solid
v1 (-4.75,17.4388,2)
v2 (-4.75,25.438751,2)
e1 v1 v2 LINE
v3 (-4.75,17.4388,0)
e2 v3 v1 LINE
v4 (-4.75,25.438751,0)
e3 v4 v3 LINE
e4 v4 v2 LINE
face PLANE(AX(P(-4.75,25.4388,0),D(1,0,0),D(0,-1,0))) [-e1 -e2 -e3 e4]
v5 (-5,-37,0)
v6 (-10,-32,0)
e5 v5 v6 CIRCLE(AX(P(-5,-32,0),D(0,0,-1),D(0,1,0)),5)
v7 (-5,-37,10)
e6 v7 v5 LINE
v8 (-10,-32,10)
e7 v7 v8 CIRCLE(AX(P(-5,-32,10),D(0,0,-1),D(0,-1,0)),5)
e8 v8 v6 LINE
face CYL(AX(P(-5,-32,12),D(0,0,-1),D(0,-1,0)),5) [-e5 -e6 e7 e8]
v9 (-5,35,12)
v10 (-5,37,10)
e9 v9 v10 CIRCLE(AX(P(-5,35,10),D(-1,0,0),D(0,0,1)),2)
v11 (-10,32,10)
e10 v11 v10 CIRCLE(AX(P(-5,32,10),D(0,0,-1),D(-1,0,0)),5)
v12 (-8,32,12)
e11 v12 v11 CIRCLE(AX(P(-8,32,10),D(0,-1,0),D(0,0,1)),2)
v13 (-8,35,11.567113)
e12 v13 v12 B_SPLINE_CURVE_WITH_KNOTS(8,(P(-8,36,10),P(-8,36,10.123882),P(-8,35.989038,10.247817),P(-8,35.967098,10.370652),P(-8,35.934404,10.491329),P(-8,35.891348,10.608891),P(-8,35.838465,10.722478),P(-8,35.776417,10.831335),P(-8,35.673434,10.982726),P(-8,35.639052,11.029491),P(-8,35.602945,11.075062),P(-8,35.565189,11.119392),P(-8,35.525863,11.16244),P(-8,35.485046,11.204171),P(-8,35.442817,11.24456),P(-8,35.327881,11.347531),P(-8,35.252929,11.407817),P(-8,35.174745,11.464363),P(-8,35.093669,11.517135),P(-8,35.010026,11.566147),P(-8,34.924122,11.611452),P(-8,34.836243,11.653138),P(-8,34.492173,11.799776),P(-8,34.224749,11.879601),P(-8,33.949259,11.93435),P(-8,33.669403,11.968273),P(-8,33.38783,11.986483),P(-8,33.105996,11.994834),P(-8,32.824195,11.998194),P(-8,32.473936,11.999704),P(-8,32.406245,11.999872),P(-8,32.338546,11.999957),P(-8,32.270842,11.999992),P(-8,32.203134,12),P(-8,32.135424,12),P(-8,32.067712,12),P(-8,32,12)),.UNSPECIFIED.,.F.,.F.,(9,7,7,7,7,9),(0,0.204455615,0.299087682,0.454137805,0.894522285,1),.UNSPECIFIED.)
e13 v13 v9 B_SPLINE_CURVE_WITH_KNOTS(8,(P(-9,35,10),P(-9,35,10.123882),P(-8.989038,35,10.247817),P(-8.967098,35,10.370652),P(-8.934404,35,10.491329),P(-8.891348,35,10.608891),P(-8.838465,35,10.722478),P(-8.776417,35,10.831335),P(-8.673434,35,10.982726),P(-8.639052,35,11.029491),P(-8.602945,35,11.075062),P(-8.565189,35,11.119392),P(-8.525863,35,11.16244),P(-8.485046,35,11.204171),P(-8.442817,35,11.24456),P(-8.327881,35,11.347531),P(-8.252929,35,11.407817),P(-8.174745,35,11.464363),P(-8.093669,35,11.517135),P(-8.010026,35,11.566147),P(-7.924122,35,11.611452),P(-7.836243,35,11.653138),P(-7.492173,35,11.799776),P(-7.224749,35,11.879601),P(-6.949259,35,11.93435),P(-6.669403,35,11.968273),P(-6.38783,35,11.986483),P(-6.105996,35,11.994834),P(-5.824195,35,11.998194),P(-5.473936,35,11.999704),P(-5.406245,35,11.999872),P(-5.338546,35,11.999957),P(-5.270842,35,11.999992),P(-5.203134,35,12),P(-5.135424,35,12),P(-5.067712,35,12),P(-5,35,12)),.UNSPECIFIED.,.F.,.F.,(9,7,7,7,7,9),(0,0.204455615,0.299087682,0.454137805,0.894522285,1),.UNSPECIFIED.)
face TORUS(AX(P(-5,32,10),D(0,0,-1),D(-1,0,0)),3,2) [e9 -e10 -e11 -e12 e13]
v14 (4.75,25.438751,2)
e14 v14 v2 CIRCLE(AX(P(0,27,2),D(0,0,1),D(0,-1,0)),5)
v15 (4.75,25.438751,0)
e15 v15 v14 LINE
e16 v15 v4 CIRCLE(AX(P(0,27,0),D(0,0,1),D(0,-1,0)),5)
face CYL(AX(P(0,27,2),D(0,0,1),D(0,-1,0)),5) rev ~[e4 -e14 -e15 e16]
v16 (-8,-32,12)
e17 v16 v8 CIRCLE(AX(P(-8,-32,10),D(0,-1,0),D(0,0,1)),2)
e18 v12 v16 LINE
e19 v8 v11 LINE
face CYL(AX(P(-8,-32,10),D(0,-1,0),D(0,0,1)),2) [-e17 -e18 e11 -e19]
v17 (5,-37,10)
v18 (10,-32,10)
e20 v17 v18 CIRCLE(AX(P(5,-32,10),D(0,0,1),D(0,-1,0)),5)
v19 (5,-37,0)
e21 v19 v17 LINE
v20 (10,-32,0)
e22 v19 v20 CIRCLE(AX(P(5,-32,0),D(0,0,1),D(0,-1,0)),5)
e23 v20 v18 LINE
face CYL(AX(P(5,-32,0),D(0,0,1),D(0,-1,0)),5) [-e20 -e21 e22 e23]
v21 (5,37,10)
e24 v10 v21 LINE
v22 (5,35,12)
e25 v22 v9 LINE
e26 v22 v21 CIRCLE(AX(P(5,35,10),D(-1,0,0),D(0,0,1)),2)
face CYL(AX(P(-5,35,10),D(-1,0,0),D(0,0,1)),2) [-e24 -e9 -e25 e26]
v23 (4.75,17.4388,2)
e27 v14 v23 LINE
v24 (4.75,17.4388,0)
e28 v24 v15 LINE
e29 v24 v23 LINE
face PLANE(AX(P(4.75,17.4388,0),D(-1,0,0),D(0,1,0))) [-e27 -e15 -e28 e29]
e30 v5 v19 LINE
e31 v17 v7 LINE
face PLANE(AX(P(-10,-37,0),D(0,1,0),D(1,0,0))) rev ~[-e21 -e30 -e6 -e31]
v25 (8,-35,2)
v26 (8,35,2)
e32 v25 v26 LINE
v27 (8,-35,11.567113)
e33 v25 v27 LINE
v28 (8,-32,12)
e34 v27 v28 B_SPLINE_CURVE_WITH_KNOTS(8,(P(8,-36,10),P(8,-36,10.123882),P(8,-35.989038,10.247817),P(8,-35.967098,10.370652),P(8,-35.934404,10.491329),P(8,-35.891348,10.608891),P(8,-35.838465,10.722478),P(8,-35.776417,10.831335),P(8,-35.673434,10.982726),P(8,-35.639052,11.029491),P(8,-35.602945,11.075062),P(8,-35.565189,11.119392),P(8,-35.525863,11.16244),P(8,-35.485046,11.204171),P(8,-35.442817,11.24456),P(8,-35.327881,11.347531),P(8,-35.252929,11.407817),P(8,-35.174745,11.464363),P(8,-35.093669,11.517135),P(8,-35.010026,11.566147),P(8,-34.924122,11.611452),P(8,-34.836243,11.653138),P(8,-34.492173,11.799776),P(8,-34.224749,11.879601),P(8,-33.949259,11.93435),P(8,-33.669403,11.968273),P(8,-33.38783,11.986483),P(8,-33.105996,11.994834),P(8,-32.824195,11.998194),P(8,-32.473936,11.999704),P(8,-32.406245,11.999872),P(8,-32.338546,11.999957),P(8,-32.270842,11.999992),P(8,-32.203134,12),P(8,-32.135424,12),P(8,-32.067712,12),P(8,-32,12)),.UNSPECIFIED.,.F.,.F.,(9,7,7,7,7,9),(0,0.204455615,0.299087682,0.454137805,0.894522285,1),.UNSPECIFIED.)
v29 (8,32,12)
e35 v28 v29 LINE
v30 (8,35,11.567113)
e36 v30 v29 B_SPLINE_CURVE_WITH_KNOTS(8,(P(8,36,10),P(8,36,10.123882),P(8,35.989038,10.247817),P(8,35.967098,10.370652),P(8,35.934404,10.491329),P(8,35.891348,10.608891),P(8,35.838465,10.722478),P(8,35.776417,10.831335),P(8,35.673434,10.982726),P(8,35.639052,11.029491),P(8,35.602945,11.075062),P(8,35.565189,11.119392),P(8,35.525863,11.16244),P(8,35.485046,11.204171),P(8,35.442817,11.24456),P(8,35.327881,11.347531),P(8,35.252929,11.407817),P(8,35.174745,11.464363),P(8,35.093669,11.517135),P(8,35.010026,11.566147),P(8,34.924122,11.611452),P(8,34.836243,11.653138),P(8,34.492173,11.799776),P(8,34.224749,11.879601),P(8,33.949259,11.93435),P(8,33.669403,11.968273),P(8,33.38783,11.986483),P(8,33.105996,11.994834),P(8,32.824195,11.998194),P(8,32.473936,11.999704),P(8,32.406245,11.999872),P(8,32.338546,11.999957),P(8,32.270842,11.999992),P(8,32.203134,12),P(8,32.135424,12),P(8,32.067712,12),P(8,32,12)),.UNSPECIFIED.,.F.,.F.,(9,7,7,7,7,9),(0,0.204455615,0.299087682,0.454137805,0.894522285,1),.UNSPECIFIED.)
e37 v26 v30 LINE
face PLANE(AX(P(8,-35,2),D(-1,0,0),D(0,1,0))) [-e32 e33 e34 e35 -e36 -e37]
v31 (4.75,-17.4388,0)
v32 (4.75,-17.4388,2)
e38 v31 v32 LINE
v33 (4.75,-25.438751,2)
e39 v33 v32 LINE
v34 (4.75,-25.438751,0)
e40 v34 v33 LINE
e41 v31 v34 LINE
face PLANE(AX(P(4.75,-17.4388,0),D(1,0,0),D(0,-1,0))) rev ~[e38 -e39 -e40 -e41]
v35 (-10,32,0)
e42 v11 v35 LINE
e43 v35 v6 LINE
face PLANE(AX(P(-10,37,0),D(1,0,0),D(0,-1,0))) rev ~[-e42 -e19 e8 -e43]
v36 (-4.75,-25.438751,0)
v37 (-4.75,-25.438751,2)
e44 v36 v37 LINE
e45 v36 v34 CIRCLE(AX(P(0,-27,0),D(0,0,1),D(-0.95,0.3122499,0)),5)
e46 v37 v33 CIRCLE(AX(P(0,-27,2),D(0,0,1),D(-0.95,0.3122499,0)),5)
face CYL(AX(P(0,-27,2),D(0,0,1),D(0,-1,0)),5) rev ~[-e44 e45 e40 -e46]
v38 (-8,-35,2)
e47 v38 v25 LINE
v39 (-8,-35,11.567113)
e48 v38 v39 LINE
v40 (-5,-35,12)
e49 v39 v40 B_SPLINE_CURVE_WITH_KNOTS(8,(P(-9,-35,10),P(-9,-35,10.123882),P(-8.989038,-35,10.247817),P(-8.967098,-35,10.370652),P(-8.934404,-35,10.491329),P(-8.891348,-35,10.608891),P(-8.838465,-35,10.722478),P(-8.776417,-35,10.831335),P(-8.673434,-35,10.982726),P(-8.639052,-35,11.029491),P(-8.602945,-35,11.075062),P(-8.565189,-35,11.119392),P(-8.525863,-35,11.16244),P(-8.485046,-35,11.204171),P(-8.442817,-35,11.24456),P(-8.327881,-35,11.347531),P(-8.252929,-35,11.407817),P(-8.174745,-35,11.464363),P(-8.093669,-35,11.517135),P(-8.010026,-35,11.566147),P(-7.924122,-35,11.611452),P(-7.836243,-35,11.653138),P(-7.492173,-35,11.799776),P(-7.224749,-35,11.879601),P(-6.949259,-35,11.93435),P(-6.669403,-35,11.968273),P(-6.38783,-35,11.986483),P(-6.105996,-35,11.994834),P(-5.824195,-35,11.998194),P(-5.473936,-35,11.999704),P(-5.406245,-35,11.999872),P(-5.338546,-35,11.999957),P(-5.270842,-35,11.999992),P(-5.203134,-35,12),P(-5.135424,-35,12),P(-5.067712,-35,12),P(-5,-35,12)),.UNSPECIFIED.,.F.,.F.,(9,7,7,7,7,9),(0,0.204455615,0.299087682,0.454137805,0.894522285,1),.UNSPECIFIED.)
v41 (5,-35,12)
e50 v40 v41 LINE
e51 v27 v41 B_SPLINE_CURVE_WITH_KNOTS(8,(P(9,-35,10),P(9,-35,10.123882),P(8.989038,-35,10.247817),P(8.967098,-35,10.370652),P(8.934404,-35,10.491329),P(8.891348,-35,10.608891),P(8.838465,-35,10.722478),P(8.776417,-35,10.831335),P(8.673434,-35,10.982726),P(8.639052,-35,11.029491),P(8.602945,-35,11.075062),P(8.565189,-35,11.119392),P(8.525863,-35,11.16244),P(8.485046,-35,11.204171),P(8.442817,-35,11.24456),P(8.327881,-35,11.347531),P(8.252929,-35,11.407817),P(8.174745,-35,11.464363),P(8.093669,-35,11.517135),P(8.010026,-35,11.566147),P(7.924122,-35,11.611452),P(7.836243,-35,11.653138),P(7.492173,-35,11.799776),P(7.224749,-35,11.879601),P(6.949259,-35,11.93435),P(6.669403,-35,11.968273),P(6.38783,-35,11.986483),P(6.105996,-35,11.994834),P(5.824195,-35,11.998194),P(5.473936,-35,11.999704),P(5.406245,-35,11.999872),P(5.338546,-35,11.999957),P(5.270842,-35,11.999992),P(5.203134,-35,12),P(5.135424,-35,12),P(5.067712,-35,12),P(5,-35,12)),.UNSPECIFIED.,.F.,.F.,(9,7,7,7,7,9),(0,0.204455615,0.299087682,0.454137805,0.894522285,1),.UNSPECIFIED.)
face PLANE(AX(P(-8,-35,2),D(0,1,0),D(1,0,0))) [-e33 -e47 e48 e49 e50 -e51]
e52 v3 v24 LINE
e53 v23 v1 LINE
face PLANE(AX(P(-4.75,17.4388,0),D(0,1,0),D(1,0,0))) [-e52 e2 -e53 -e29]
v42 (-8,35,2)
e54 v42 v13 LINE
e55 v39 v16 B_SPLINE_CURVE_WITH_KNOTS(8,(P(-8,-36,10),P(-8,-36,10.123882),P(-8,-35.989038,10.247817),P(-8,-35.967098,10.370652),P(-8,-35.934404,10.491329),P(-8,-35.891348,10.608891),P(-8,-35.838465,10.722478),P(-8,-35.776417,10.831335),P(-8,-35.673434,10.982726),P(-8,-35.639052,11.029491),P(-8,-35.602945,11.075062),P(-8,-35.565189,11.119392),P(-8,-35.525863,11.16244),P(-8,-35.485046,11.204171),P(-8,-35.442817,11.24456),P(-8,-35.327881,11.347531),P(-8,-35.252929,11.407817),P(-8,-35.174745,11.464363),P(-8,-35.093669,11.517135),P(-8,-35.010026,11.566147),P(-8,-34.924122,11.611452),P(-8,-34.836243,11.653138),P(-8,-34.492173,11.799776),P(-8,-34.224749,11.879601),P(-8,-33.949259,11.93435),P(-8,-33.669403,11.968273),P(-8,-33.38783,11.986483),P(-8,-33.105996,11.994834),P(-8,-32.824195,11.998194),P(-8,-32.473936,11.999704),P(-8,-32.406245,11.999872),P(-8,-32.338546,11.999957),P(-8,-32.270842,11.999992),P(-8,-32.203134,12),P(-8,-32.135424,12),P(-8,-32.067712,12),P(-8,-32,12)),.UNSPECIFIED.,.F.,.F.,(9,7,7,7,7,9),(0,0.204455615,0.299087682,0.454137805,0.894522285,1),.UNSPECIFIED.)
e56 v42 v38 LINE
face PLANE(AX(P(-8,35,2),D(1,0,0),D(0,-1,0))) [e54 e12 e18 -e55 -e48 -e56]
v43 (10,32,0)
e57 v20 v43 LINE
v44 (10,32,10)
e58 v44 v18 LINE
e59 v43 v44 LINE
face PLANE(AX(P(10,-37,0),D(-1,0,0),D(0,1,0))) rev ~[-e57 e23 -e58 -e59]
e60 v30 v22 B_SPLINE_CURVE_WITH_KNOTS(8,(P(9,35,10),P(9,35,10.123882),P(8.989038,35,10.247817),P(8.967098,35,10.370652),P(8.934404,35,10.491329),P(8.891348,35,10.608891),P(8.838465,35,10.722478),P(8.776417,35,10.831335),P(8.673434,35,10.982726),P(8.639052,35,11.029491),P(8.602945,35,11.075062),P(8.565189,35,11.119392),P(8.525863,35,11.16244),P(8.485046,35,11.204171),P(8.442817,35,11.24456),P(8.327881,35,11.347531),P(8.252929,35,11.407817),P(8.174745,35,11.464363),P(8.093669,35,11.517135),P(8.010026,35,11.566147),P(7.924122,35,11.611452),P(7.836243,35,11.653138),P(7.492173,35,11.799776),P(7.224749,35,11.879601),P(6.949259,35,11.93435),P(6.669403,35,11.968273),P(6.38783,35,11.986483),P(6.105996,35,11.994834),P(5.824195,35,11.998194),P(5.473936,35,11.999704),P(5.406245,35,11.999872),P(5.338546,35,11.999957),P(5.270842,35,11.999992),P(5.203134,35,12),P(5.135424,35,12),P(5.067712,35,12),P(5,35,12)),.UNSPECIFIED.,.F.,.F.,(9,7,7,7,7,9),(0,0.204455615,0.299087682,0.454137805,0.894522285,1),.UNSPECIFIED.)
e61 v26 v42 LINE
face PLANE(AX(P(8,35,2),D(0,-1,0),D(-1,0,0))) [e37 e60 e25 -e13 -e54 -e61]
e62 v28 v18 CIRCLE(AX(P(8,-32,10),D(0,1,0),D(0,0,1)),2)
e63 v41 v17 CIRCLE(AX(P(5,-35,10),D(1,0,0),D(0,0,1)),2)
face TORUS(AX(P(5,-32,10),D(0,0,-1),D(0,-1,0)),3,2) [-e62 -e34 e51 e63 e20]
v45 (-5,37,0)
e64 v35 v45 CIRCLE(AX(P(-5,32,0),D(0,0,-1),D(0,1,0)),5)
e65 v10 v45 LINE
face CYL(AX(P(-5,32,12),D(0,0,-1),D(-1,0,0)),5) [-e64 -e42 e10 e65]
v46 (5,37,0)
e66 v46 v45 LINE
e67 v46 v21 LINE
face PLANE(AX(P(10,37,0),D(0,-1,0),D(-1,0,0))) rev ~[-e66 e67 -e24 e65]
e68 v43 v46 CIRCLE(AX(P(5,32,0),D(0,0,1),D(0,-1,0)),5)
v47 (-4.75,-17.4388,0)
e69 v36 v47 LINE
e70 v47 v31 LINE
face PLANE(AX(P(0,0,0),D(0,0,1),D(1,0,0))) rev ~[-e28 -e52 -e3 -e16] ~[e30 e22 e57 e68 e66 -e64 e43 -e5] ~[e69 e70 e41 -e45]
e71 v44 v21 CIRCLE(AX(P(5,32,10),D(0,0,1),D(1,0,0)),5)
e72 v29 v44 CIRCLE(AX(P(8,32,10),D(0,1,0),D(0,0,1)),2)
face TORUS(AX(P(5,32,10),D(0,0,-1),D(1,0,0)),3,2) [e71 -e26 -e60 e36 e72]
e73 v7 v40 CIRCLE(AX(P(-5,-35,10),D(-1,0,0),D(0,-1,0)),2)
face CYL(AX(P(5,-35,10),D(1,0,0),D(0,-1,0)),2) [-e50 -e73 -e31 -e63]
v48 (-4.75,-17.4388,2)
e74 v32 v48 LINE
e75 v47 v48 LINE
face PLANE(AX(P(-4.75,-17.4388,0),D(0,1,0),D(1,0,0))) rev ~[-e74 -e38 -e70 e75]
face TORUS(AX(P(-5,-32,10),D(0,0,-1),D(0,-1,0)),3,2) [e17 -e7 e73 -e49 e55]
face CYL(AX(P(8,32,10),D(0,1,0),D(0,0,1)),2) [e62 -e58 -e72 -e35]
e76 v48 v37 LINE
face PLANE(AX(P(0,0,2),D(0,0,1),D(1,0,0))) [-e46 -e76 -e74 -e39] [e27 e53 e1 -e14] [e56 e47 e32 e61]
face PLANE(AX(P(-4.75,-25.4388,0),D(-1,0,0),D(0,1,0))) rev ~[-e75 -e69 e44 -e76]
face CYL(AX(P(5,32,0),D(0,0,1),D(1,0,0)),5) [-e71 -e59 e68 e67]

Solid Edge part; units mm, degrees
sketch "Sketch1" plane through (0, 0, 0) normal (0, 0, 1) x (1, 0, 0)
  line L0 (-10, -37) -> (10, -37)
  line L1 (10, -37) -> (10, 37)
  line L2 (10, 37) -> (-10, 37)
  line L3 (-10, 37) -> (-10, -37)
  dimension "D1" = 20
  dimension "D2" = 74
extrude "Protrusion1" add sketch "Sketch1" along normal blind 2
sketch "Sketch2" plane through (0, 0, 2) normal (0, 0, 1) x (1, 0, 0)
  line L0 (-10, 37) -> (10, 37)
  line L1 (10, 37) -> (10, -37)
  line L2 (10, -37) -> (-10, -37)
  line L3 (-10, -37) -> (-10, 37)
  line L4 (-8, -35) -> (8, -35)
  line L5 (8, -35) -> (8, 35)
  line L6 (8, 35) -> (-8, 35)
  line L7 (-8, 35) -> (-8, -35)
  dimension "D1" = 16
  dimension "D2" = 70
extrude "Extrusionsausprägung_2" add sketch "Sketch2" along normal blind 10
fillet "Verrundung_3" radius 5 4 edges at (-10, -37, 6) (10, -37, 6) (-10, 37, 6) (10, 37, 6)
fillet "Verrundung_4" radius 2 8 edges at (10, 0, 12) (8.5355, -35.5355, 12) (0, -37, 12) (-8.5355, -35.5355, 12) (-10, 0, 12) (-8.5355, 35.5355, 12) (0, 37, 12) (8.5355, 35.5355, 12)
sketch "Sketch3" plane through (0, 0, 2) normal (0, 0, 1) x (0, -1, 0)
  circle A0 centre (-27, 0) radius 5
  circle A1 centre (27, 0) radius 5
  dimension "D1" = 54
  dimension "D2" = 10
extrude "Cutout1" cut sketch "Sketch3" against normal through all
sketch "Sketch4" plane through (0, 0, 0) normal (0, 0, -1) x (0, -1, 0)
  line L0 (-25.4388, 4.75) -> (-17.4388, 4.75)
  line L1 (-17.4388, 4.75) -> (-17.4388, -4.75)
  line L2 (-17.4388, -4.75) -> (-25.4388, -4.75)
  line L3 (-25.4388, -4.75) -> (-25.4388, 4.75)
  line L4 (25.4388, 4.75) -> (17.4388, 4.75)
  line L5 (17.4388, 4.75) -> (17.4388, -4.75)
  line L6 (17.4388, -4.75) -> (25.4388, -4.75)
  line L7 (25.4388, -4.75) -> (25.4388, 4.75)
  dimension "D1" = 9.5
  dimension "D2" = 8
extrude "Cutout2" cut sketch "Sketch4" against normal through all
